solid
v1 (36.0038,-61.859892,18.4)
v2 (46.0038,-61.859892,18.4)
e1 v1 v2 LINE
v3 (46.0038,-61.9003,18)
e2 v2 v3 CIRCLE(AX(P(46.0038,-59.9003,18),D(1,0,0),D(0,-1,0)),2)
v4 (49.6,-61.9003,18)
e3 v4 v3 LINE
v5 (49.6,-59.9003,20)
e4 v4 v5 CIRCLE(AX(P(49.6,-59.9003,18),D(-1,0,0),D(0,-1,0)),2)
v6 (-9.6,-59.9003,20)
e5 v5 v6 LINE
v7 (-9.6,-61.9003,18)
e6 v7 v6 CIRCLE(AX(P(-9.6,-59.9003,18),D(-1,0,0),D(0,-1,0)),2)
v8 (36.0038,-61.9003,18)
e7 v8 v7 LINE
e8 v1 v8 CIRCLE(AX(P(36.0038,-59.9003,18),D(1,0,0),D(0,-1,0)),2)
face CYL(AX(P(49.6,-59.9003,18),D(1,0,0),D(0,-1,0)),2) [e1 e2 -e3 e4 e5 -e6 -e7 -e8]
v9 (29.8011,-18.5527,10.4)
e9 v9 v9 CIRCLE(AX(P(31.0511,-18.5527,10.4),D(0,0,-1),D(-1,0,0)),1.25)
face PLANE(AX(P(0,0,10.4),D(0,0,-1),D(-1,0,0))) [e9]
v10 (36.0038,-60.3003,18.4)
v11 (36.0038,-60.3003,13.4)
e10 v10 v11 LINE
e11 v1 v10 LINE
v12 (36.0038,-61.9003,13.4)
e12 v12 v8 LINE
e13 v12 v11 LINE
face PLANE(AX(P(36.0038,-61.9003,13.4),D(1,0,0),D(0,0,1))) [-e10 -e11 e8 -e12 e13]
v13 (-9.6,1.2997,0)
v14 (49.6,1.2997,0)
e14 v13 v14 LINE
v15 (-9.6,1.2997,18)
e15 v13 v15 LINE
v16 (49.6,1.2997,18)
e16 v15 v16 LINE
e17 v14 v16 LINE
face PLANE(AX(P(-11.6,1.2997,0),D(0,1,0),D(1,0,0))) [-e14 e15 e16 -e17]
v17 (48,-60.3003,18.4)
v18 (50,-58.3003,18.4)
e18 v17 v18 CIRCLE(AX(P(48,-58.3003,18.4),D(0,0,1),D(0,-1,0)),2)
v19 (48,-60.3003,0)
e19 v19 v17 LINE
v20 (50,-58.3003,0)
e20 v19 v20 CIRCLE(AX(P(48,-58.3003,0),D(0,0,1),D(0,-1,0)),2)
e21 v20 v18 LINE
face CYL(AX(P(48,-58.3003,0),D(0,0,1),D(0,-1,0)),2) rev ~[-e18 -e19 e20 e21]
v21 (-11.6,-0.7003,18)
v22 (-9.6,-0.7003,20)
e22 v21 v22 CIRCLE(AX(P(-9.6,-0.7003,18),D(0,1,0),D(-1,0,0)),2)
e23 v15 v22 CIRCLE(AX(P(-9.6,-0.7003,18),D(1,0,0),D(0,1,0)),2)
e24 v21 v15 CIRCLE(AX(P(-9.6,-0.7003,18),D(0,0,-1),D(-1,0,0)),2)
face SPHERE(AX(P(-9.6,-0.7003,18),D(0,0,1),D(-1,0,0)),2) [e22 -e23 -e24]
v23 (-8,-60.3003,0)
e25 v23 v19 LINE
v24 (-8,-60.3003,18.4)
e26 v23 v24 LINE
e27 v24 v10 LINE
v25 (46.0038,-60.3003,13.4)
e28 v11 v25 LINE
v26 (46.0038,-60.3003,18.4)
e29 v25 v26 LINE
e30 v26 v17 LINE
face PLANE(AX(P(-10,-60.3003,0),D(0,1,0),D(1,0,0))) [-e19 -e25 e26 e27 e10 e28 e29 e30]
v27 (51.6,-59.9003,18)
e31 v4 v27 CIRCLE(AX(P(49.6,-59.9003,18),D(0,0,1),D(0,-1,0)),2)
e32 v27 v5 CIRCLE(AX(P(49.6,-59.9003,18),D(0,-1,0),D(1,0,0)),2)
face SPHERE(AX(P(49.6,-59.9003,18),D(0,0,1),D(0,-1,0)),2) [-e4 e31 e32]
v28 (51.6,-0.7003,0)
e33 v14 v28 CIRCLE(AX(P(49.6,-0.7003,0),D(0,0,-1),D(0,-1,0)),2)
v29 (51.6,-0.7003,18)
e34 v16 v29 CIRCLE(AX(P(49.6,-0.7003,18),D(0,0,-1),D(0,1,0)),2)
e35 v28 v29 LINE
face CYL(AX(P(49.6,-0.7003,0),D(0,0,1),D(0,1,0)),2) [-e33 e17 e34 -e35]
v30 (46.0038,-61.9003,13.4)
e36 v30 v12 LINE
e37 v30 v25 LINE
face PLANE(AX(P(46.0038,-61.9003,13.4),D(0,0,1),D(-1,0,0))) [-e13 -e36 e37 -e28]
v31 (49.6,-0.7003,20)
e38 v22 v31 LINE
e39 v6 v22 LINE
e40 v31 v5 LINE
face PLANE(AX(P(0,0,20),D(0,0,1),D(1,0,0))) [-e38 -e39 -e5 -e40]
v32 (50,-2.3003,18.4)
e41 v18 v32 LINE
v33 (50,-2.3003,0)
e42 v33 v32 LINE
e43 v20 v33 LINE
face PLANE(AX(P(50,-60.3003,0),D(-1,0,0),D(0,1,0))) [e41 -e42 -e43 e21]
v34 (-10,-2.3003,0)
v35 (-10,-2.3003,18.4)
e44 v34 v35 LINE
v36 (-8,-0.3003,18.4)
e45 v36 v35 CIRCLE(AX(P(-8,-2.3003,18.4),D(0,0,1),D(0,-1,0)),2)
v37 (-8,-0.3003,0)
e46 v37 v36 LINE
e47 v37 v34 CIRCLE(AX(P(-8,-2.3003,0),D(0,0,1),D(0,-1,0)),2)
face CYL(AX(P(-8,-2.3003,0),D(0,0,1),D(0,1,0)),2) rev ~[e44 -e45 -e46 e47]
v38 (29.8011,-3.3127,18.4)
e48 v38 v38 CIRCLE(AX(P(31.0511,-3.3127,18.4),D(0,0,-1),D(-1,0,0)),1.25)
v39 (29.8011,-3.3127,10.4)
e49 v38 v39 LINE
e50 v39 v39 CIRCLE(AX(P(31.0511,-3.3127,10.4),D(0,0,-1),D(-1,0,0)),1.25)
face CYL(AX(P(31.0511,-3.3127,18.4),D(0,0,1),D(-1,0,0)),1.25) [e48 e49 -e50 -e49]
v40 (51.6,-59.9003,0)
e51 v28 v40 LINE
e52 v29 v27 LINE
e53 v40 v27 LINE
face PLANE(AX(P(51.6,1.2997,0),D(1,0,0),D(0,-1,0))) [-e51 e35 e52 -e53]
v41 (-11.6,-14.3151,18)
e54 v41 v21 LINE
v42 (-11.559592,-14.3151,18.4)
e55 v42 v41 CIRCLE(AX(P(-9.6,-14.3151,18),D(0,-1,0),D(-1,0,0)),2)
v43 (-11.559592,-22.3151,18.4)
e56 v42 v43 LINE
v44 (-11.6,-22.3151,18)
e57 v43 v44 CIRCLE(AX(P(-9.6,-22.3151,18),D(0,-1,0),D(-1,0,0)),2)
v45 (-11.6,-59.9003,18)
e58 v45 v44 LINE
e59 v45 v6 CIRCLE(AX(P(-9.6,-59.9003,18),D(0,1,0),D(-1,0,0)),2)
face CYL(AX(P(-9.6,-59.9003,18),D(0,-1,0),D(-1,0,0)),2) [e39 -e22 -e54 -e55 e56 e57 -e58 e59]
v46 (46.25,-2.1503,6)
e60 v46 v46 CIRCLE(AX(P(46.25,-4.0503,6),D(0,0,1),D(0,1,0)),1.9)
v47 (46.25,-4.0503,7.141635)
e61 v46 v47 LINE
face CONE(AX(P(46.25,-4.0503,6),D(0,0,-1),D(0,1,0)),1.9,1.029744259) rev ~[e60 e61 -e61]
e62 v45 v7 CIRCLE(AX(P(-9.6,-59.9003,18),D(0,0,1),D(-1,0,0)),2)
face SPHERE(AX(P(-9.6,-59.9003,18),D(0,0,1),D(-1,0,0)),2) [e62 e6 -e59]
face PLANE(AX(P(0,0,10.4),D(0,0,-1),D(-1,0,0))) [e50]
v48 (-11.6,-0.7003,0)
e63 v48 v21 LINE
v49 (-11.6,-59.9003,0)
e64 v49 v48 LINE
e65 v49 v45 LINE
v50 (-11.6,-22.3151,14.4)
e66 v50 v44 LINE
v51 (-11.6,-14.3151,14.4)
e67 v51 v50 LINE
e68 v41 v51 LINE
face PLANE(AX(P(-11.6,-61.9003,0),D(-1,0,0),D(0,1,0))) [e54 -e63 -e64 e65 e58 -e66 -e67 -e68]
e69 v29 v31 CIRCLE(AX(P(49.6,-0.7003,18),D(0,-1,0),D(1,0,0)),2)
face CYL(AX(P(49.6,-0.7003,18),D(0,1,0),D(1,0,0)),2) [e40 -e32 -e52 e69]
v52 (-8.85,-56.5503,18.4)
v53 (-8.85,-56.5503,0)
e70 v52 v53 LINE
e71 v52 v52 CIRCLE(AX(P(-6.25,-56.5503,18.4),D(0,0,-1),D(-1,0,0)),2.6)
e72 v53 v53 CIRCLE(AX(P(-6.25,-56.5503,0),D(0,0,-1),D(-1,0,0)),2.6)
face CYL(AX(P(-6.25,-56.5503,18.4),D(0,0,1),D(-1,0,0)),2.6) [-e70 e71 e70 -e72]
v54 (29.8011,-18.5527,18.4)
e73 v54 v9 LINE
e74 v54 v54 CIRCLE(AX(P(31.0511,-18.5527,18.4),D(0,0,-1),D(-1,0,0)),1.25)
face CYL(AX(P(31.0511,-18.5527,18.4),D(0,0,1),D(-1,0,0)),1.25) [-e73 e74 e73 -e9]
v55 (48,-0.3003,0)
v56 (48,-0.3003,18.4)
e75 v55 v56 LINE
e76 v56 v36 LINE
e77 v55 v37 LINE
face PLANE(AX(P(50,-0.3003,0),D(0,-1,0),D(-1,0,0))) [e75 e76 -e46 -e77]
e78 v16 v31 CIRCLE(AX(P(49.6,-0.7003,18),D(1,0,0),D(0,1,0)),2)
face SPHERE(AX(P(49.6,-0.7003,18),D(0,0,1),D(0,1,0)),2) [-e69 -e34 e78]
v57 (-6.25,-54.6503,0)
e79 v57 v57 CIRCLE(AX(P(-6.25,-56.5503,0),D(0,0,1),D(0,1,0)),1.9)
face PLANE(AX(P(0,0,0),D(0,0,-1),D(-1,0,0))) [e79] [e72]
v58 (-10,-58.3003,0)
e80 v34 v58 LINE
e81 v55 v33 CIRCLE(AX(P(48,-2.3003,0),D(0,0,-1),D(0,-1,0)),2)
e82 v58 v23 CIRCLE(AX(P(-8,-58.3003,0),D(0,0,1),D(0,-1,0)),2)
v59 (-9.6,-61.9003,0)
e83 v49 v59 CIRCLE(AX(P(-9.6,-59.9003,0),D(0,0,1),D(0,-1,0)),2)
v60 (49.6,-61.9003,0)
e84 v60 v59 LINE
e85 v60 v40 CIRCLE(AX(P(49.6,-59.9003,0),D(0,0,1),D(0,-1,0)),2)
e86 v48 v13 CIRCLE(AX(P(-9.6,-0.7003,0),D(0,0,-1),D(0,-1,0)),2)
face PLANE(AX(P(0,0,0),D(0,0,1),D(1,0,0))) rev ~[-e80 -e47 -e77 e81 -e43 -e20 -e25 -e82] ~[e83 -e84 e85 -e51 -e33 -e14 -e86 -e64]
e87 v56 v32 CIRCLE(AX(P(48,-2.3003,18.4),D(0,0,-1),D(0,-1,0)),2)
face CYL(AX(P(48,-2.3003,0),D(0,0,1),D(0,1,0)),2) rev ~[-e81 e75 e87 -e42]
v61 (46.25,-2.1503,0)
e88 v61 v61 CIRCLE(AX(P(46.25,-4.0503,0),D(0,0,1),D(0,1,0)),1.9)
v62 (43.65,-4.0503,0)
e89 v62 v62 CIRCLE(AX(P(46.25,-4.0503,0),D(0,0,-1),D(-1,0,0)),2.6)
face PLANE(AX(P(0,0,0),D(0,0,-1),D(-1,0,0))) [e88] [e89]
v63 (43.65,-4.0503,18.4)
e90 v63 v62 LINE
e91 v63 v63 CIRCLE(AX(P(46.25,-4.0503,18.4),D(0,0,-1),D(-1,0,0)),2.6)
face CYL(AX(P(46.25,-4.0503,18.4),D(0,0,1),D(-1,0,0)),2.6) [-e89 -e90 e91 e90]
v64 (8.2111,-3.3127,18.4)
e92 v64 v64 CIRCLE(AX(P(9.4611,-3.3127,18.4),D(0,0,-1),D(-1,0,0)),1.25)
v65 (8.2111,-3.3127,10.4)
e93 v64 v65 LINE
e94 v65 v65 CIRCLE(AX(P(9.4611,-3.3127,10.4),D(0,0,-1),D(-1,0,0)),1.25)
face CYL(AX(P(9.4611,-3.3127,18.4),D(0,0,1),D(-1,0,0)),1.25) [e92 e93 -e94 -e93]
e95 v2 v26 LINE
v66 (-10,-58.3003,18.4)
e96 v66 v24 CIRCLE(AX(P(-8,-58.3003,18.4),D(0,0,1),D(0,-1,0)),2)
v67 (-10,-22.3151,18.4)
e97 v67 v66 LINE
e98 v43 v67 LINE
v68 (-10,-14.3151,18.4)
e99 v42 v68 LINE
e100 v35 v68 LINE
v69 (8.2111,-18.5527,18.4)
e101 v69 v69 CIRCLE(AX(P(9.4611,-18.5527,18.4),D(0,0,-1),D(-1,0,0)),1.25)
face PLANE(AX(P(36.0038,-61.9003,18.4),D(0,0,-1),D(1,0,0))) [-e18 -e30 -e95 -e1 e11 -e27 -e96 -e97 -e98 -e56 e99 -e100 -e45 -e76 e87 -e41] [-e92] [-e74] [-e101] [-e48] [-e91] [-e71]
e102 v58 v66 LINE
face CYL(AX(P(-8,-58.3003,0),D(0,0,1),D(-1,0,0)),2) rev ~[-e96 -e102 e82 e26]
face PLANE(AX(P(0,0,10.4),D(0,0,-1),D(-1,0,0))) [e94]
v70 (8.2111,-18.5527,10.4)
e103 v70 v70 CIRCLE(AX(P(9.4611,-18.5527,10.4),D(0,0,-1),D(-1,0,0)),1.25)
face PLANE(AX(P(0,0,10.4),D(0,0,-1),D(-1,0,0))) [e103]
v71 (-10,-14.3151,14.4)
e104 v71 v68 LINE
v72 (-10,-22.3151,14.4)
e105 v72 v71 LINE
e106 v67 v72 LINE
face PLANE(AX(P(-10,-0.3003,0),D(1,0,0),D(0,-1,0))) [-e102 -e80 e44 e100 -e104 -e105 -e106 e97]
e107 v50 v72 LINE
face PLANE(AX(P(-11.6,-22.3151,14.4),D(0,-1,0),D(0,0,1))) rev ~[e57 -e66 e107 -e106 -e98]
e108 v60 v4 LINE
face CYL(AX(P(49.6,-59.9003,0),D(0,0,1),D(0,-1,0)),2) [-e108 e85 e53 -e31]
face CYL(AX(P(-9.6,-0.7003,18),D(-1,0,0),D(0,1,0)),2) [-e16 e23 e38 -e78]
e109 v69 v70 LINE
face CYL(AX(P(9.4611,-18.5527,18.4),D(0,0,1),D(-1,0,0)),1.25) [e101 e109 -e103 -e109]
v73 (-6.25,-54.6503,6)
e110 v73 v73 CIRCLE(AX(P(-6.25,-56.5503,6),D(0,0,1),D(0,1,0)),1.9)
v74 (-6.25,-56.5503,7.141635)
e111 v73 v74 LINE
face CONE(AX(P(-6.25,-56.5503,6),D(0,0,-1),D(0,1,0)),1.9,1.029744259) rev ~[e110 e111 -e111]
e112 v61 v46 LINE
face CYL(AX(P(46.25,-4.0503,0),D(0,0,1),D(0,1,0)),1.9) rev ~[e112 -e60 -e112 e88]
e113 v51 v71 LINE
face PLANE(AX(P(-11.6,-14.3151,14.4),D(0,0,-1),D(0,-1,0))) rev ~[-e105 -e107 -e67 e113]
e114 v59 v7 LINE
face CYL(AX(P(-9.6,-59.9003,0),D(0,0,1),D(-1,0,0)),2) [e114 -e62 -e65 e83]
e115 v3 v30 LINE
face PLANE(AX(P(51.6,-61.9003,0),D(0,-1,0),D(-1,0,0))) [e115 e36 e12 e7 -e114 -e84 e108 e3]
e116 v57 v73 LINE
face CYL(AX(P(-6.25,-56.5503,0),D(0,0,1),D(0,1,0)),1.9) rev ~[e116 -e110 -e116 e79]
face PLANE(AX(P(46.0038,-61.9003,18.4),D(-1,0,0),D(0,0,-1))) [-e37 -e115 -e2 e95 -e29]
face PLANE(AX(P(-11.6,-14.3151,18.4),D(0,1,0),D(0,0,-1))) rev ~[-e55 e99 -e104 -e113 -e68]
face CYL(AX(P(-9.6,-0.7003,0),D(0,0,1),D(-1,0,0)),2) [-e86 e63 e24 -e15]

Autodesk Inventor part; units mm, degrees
ref_plane "YZ Plane" through (0, 0, 0) normal (1, 0, 0) x (0, 1, 0)
ref_plane "XZ Plane" through (0, 0, 0) normal (0, 1, 0) x (-1, 0, 0)
ref_plane "XY Plane" through (0, 0, 0) normal (0, 0, 1) x (1, 0, 0)
sketch "Sketch1" plane through (0, 0, 0) normal (0, 0, 1) x (1, 0, 0)
  line L0 (-10, -0.3003) -> (50, -0.3003)
  line L1 (50, -0.3003) -> (50, -60.3003)
  line L2 (50, -60.3003) -> (-10, -60.3003)
  line L3 (-10, -60.3003) -> (-10, -0.3003)
  line L4 (-11.6, 1.2997) -> (51.6, 1.2997)
  line L5 (51.6, 1.2997) -> (51.6, -61.9003)
  line L6 (51.6, -61.9003) -> (-11.6, -61.9003)
  line L7 (-11.6, -61.9003) -> (-11.6, 1.2997)
  point P0 (-10, -30.3003)
  point P1 (-11.6, -30.3003)
  dimension "d1" = 60
  dimension "d2" = 60
  dimension "d3" = 1.6
  dimension "d4" = 1.6
  dimension "d5" = 1.6
  dimension "d6" = 1.6
extrude "Extrusion1" add sketch "Sketch1" along normal blind 20 contours L0 L1 L2 L3 | L4 L5 L6 L7
sketch "Sketch2" plane through (0, 0, 0) normal (0, 0, -1) x (-1, 0, 0)
  line L0 (-50, -0.3003) -> (10, -0.3003)
  line L1 (10, -0.3003) -> (10, -60.3003)
  line L2 (10, -60.3003) -> (-50, -60.3003)
  line L3 (-50, -60.3003) -> (-50, -0.3003)
  line L4 (-51.6, 1.2997) -> (11.6, 1.2997) projected
  line L5 (11.6, -61.9003) -> (-51.6, -61.9003) projected
  line L6 (-51.6, -61.9003) -> (-51.6, 1.2997) projected
  line L7 (11.6, 1.2997) -> (11.6, -61.9003) projected
  point P0 (0, 0)
  dimension "d9" = 60
  dimension "d10" = 1.6
  dimension "d11" = 1.6
  dimension "d12" = 1.6
  dimension "d61" = 1.6
extrude "Extrusion2" cut sketch "Sketch2" against normal blind 18.4 contours L0 L1 L2 L3
sketch "Sketch3" plane through (-11.6, -61.9003, 0) normal (0, -1, 0) x (1, 0, 0)
  line L0 (57.6038, 13.4) -> (47.6038, 13.4)
  line L1 (47.6038, 13.4) -> (47.6038, 18.4)
  line L2 (47.6038, 18.4) -> (57.6038, 18.4)
  line L3 (57.6038, 18.4) -> (57.6038, 13.4)
  line L4 (0, 20) -> (63.2, 20) projected
  point P0 (11.6, 0)
  point P1 (52.6038, 18.4)
  dimension "d15" = 10
  dimension "d16" = 5
  dimension "d17" = 1.6
extrude "Extrusion3" cut sketch "Sketch3" against normal blind 18.4
fillet "Fillet1" radius 2 1 edges at (-11.6, -61.9003, 10)
fillet "Fillet2" radius 2 3 edges at (-11.6, 1.2997, 10) (51.6, 1.2997, 10) (51.6, -61.9003, 10)
fillet "Fillet3" radius 2 8 edges at (51.0142, -61.3145, 20) (51.6, -30.3003, 20) (51.0142, 0.7139, 20) (20, 1.2997, 20) (-11.0142, 0.7139, 20) (-11.6, -30.3003, 20) (-11.0142, -61.3145, 20) (20, -61.9003, 20)
sketch "Sketch4" plane through (-11.6, -59.9003, 0) normal (-1, 0, 0) x (0, 0, 1)
  line L0 (14.4, 37.5852) -> (18.4, 37.5852)
  line L1 (18.4, 37.5852) -> (18.4, 45.5852)
  line L2 (18.4, 45.5852) -> (14.4, 45.5852)
  line L3 (14.4, 45.5852) -> (14.4, 37.5852)
  line L4 (20, 0) -> (20, 59.2) projected
  point P0 (0, 59.9003)
  point P1 (18.4, 41.5852)
  dimension "d23" = 4
  dimension "d24" = 8
  dimension "d25" = 1.6
extrude "Extrusion4" cut sketch "Sketch4" against normal blind 18.4
sketch "Sketch5" plane through (0, 0, 18.4) normal (0, 0, -1) x (-1, 0, 0)
  point P0 (0, 0)
sketch "Sketch6" plane through (0, 0, 18.4) normal (0, 0, -1) x (-1, 0, 0)
  point P0 (0, 0)
fillet "Fillet4" radius 2 4 edges at (50, -0.3003, 9.2) (-10, -0.3003, 9.2) (-10, -60.3003, 9.2) (50, -60.3003, 9.2)
sketch "Sketch7" plane through (0, 0, 18.4) normal (0, 0, -1) x (-1, 0, 0)
  point P0 (0, 0)
sketch "Sketch8" plane through (0, 0, 18.4) normal (0, 0, -1) x (-1, 0, 0)
  circle A0 centre (-46.25, -4.0503) radius 2.6
  circle A1 centre (6.25, -56.5503) radius 2.6
  line L0 (-48, -0.3003) -> (8, -0.3003) projected
  line L1 (-50, -58.3003) -> (-50, -2.3003) projected
  line L2 (10, -2.3003) -> (10, -58.3003) projected
  line L3 (8, -60.3003) -> (-48, -60.3003) projected
  point P0 (0, 0)
  dimension "d30" = 5.2
  dimension "d31" = 5.2
  dimension "d32" = 3.75
  dimension "d33" = 3.75
  dimension "d34" = 3.75
  dimension "d35" = 3.75
extrude "Extrusion5" add sketch "Sketch8" along normal up to surface (18.4 mm away)
sketch "Sketch9" plane through (46.25, -4.0503, 0) normal (0, 0, -1) x (-1, 0, 0)
  circle A0 centre (0, 0) radius 2.6 projected
  point P0 (46.25, 4.0503)
hole "Hole1" at (46.25, -4.0503, 0) direction (0, 0, 1) diameter 3.8 depth 6 tip angle 118
sketch "Sketch10" plane through (-6.25, -56.5503, 0) normal (0, 0, -1) x (-1, 0, 0)
  circle A0 centre (0, 0) radius 2.6 projected
  point P0 (-6.25, 56.5503)
hole "Hole2" at (-6.25, -56.5503, 0) direction (0, 0, 1) diameter 3.8 depth 6 tip angle 118
sketch "Sketch11" plane through (0, 0, 18.4) normal (0, 0, -1) x (-1, 0, 0)
  circle A0 centre (-9.4611, -3.3127) radius 1.25
  circle A1 centre (-9.4611, -18.5527) radius 1.25
  circle A2 centre (-31.0511, -3.3127) radius 1.25
  circle A3 centre (-31.0511, -18.5527) radius 1.25
  line L0 (-50, -58.3003) -> (-50, -2.3003) projected
  point P0 (0, 0)
  dimension "d54" = 2.5
  dimension "d55" = 2.5
  dimension "d56" = 2.5
  dimension "d57" = 2.5
extrude "Extrusion6" add sketch "Sketch11" along normal blind 8
properties part number "LimB_module" material "Brass"
